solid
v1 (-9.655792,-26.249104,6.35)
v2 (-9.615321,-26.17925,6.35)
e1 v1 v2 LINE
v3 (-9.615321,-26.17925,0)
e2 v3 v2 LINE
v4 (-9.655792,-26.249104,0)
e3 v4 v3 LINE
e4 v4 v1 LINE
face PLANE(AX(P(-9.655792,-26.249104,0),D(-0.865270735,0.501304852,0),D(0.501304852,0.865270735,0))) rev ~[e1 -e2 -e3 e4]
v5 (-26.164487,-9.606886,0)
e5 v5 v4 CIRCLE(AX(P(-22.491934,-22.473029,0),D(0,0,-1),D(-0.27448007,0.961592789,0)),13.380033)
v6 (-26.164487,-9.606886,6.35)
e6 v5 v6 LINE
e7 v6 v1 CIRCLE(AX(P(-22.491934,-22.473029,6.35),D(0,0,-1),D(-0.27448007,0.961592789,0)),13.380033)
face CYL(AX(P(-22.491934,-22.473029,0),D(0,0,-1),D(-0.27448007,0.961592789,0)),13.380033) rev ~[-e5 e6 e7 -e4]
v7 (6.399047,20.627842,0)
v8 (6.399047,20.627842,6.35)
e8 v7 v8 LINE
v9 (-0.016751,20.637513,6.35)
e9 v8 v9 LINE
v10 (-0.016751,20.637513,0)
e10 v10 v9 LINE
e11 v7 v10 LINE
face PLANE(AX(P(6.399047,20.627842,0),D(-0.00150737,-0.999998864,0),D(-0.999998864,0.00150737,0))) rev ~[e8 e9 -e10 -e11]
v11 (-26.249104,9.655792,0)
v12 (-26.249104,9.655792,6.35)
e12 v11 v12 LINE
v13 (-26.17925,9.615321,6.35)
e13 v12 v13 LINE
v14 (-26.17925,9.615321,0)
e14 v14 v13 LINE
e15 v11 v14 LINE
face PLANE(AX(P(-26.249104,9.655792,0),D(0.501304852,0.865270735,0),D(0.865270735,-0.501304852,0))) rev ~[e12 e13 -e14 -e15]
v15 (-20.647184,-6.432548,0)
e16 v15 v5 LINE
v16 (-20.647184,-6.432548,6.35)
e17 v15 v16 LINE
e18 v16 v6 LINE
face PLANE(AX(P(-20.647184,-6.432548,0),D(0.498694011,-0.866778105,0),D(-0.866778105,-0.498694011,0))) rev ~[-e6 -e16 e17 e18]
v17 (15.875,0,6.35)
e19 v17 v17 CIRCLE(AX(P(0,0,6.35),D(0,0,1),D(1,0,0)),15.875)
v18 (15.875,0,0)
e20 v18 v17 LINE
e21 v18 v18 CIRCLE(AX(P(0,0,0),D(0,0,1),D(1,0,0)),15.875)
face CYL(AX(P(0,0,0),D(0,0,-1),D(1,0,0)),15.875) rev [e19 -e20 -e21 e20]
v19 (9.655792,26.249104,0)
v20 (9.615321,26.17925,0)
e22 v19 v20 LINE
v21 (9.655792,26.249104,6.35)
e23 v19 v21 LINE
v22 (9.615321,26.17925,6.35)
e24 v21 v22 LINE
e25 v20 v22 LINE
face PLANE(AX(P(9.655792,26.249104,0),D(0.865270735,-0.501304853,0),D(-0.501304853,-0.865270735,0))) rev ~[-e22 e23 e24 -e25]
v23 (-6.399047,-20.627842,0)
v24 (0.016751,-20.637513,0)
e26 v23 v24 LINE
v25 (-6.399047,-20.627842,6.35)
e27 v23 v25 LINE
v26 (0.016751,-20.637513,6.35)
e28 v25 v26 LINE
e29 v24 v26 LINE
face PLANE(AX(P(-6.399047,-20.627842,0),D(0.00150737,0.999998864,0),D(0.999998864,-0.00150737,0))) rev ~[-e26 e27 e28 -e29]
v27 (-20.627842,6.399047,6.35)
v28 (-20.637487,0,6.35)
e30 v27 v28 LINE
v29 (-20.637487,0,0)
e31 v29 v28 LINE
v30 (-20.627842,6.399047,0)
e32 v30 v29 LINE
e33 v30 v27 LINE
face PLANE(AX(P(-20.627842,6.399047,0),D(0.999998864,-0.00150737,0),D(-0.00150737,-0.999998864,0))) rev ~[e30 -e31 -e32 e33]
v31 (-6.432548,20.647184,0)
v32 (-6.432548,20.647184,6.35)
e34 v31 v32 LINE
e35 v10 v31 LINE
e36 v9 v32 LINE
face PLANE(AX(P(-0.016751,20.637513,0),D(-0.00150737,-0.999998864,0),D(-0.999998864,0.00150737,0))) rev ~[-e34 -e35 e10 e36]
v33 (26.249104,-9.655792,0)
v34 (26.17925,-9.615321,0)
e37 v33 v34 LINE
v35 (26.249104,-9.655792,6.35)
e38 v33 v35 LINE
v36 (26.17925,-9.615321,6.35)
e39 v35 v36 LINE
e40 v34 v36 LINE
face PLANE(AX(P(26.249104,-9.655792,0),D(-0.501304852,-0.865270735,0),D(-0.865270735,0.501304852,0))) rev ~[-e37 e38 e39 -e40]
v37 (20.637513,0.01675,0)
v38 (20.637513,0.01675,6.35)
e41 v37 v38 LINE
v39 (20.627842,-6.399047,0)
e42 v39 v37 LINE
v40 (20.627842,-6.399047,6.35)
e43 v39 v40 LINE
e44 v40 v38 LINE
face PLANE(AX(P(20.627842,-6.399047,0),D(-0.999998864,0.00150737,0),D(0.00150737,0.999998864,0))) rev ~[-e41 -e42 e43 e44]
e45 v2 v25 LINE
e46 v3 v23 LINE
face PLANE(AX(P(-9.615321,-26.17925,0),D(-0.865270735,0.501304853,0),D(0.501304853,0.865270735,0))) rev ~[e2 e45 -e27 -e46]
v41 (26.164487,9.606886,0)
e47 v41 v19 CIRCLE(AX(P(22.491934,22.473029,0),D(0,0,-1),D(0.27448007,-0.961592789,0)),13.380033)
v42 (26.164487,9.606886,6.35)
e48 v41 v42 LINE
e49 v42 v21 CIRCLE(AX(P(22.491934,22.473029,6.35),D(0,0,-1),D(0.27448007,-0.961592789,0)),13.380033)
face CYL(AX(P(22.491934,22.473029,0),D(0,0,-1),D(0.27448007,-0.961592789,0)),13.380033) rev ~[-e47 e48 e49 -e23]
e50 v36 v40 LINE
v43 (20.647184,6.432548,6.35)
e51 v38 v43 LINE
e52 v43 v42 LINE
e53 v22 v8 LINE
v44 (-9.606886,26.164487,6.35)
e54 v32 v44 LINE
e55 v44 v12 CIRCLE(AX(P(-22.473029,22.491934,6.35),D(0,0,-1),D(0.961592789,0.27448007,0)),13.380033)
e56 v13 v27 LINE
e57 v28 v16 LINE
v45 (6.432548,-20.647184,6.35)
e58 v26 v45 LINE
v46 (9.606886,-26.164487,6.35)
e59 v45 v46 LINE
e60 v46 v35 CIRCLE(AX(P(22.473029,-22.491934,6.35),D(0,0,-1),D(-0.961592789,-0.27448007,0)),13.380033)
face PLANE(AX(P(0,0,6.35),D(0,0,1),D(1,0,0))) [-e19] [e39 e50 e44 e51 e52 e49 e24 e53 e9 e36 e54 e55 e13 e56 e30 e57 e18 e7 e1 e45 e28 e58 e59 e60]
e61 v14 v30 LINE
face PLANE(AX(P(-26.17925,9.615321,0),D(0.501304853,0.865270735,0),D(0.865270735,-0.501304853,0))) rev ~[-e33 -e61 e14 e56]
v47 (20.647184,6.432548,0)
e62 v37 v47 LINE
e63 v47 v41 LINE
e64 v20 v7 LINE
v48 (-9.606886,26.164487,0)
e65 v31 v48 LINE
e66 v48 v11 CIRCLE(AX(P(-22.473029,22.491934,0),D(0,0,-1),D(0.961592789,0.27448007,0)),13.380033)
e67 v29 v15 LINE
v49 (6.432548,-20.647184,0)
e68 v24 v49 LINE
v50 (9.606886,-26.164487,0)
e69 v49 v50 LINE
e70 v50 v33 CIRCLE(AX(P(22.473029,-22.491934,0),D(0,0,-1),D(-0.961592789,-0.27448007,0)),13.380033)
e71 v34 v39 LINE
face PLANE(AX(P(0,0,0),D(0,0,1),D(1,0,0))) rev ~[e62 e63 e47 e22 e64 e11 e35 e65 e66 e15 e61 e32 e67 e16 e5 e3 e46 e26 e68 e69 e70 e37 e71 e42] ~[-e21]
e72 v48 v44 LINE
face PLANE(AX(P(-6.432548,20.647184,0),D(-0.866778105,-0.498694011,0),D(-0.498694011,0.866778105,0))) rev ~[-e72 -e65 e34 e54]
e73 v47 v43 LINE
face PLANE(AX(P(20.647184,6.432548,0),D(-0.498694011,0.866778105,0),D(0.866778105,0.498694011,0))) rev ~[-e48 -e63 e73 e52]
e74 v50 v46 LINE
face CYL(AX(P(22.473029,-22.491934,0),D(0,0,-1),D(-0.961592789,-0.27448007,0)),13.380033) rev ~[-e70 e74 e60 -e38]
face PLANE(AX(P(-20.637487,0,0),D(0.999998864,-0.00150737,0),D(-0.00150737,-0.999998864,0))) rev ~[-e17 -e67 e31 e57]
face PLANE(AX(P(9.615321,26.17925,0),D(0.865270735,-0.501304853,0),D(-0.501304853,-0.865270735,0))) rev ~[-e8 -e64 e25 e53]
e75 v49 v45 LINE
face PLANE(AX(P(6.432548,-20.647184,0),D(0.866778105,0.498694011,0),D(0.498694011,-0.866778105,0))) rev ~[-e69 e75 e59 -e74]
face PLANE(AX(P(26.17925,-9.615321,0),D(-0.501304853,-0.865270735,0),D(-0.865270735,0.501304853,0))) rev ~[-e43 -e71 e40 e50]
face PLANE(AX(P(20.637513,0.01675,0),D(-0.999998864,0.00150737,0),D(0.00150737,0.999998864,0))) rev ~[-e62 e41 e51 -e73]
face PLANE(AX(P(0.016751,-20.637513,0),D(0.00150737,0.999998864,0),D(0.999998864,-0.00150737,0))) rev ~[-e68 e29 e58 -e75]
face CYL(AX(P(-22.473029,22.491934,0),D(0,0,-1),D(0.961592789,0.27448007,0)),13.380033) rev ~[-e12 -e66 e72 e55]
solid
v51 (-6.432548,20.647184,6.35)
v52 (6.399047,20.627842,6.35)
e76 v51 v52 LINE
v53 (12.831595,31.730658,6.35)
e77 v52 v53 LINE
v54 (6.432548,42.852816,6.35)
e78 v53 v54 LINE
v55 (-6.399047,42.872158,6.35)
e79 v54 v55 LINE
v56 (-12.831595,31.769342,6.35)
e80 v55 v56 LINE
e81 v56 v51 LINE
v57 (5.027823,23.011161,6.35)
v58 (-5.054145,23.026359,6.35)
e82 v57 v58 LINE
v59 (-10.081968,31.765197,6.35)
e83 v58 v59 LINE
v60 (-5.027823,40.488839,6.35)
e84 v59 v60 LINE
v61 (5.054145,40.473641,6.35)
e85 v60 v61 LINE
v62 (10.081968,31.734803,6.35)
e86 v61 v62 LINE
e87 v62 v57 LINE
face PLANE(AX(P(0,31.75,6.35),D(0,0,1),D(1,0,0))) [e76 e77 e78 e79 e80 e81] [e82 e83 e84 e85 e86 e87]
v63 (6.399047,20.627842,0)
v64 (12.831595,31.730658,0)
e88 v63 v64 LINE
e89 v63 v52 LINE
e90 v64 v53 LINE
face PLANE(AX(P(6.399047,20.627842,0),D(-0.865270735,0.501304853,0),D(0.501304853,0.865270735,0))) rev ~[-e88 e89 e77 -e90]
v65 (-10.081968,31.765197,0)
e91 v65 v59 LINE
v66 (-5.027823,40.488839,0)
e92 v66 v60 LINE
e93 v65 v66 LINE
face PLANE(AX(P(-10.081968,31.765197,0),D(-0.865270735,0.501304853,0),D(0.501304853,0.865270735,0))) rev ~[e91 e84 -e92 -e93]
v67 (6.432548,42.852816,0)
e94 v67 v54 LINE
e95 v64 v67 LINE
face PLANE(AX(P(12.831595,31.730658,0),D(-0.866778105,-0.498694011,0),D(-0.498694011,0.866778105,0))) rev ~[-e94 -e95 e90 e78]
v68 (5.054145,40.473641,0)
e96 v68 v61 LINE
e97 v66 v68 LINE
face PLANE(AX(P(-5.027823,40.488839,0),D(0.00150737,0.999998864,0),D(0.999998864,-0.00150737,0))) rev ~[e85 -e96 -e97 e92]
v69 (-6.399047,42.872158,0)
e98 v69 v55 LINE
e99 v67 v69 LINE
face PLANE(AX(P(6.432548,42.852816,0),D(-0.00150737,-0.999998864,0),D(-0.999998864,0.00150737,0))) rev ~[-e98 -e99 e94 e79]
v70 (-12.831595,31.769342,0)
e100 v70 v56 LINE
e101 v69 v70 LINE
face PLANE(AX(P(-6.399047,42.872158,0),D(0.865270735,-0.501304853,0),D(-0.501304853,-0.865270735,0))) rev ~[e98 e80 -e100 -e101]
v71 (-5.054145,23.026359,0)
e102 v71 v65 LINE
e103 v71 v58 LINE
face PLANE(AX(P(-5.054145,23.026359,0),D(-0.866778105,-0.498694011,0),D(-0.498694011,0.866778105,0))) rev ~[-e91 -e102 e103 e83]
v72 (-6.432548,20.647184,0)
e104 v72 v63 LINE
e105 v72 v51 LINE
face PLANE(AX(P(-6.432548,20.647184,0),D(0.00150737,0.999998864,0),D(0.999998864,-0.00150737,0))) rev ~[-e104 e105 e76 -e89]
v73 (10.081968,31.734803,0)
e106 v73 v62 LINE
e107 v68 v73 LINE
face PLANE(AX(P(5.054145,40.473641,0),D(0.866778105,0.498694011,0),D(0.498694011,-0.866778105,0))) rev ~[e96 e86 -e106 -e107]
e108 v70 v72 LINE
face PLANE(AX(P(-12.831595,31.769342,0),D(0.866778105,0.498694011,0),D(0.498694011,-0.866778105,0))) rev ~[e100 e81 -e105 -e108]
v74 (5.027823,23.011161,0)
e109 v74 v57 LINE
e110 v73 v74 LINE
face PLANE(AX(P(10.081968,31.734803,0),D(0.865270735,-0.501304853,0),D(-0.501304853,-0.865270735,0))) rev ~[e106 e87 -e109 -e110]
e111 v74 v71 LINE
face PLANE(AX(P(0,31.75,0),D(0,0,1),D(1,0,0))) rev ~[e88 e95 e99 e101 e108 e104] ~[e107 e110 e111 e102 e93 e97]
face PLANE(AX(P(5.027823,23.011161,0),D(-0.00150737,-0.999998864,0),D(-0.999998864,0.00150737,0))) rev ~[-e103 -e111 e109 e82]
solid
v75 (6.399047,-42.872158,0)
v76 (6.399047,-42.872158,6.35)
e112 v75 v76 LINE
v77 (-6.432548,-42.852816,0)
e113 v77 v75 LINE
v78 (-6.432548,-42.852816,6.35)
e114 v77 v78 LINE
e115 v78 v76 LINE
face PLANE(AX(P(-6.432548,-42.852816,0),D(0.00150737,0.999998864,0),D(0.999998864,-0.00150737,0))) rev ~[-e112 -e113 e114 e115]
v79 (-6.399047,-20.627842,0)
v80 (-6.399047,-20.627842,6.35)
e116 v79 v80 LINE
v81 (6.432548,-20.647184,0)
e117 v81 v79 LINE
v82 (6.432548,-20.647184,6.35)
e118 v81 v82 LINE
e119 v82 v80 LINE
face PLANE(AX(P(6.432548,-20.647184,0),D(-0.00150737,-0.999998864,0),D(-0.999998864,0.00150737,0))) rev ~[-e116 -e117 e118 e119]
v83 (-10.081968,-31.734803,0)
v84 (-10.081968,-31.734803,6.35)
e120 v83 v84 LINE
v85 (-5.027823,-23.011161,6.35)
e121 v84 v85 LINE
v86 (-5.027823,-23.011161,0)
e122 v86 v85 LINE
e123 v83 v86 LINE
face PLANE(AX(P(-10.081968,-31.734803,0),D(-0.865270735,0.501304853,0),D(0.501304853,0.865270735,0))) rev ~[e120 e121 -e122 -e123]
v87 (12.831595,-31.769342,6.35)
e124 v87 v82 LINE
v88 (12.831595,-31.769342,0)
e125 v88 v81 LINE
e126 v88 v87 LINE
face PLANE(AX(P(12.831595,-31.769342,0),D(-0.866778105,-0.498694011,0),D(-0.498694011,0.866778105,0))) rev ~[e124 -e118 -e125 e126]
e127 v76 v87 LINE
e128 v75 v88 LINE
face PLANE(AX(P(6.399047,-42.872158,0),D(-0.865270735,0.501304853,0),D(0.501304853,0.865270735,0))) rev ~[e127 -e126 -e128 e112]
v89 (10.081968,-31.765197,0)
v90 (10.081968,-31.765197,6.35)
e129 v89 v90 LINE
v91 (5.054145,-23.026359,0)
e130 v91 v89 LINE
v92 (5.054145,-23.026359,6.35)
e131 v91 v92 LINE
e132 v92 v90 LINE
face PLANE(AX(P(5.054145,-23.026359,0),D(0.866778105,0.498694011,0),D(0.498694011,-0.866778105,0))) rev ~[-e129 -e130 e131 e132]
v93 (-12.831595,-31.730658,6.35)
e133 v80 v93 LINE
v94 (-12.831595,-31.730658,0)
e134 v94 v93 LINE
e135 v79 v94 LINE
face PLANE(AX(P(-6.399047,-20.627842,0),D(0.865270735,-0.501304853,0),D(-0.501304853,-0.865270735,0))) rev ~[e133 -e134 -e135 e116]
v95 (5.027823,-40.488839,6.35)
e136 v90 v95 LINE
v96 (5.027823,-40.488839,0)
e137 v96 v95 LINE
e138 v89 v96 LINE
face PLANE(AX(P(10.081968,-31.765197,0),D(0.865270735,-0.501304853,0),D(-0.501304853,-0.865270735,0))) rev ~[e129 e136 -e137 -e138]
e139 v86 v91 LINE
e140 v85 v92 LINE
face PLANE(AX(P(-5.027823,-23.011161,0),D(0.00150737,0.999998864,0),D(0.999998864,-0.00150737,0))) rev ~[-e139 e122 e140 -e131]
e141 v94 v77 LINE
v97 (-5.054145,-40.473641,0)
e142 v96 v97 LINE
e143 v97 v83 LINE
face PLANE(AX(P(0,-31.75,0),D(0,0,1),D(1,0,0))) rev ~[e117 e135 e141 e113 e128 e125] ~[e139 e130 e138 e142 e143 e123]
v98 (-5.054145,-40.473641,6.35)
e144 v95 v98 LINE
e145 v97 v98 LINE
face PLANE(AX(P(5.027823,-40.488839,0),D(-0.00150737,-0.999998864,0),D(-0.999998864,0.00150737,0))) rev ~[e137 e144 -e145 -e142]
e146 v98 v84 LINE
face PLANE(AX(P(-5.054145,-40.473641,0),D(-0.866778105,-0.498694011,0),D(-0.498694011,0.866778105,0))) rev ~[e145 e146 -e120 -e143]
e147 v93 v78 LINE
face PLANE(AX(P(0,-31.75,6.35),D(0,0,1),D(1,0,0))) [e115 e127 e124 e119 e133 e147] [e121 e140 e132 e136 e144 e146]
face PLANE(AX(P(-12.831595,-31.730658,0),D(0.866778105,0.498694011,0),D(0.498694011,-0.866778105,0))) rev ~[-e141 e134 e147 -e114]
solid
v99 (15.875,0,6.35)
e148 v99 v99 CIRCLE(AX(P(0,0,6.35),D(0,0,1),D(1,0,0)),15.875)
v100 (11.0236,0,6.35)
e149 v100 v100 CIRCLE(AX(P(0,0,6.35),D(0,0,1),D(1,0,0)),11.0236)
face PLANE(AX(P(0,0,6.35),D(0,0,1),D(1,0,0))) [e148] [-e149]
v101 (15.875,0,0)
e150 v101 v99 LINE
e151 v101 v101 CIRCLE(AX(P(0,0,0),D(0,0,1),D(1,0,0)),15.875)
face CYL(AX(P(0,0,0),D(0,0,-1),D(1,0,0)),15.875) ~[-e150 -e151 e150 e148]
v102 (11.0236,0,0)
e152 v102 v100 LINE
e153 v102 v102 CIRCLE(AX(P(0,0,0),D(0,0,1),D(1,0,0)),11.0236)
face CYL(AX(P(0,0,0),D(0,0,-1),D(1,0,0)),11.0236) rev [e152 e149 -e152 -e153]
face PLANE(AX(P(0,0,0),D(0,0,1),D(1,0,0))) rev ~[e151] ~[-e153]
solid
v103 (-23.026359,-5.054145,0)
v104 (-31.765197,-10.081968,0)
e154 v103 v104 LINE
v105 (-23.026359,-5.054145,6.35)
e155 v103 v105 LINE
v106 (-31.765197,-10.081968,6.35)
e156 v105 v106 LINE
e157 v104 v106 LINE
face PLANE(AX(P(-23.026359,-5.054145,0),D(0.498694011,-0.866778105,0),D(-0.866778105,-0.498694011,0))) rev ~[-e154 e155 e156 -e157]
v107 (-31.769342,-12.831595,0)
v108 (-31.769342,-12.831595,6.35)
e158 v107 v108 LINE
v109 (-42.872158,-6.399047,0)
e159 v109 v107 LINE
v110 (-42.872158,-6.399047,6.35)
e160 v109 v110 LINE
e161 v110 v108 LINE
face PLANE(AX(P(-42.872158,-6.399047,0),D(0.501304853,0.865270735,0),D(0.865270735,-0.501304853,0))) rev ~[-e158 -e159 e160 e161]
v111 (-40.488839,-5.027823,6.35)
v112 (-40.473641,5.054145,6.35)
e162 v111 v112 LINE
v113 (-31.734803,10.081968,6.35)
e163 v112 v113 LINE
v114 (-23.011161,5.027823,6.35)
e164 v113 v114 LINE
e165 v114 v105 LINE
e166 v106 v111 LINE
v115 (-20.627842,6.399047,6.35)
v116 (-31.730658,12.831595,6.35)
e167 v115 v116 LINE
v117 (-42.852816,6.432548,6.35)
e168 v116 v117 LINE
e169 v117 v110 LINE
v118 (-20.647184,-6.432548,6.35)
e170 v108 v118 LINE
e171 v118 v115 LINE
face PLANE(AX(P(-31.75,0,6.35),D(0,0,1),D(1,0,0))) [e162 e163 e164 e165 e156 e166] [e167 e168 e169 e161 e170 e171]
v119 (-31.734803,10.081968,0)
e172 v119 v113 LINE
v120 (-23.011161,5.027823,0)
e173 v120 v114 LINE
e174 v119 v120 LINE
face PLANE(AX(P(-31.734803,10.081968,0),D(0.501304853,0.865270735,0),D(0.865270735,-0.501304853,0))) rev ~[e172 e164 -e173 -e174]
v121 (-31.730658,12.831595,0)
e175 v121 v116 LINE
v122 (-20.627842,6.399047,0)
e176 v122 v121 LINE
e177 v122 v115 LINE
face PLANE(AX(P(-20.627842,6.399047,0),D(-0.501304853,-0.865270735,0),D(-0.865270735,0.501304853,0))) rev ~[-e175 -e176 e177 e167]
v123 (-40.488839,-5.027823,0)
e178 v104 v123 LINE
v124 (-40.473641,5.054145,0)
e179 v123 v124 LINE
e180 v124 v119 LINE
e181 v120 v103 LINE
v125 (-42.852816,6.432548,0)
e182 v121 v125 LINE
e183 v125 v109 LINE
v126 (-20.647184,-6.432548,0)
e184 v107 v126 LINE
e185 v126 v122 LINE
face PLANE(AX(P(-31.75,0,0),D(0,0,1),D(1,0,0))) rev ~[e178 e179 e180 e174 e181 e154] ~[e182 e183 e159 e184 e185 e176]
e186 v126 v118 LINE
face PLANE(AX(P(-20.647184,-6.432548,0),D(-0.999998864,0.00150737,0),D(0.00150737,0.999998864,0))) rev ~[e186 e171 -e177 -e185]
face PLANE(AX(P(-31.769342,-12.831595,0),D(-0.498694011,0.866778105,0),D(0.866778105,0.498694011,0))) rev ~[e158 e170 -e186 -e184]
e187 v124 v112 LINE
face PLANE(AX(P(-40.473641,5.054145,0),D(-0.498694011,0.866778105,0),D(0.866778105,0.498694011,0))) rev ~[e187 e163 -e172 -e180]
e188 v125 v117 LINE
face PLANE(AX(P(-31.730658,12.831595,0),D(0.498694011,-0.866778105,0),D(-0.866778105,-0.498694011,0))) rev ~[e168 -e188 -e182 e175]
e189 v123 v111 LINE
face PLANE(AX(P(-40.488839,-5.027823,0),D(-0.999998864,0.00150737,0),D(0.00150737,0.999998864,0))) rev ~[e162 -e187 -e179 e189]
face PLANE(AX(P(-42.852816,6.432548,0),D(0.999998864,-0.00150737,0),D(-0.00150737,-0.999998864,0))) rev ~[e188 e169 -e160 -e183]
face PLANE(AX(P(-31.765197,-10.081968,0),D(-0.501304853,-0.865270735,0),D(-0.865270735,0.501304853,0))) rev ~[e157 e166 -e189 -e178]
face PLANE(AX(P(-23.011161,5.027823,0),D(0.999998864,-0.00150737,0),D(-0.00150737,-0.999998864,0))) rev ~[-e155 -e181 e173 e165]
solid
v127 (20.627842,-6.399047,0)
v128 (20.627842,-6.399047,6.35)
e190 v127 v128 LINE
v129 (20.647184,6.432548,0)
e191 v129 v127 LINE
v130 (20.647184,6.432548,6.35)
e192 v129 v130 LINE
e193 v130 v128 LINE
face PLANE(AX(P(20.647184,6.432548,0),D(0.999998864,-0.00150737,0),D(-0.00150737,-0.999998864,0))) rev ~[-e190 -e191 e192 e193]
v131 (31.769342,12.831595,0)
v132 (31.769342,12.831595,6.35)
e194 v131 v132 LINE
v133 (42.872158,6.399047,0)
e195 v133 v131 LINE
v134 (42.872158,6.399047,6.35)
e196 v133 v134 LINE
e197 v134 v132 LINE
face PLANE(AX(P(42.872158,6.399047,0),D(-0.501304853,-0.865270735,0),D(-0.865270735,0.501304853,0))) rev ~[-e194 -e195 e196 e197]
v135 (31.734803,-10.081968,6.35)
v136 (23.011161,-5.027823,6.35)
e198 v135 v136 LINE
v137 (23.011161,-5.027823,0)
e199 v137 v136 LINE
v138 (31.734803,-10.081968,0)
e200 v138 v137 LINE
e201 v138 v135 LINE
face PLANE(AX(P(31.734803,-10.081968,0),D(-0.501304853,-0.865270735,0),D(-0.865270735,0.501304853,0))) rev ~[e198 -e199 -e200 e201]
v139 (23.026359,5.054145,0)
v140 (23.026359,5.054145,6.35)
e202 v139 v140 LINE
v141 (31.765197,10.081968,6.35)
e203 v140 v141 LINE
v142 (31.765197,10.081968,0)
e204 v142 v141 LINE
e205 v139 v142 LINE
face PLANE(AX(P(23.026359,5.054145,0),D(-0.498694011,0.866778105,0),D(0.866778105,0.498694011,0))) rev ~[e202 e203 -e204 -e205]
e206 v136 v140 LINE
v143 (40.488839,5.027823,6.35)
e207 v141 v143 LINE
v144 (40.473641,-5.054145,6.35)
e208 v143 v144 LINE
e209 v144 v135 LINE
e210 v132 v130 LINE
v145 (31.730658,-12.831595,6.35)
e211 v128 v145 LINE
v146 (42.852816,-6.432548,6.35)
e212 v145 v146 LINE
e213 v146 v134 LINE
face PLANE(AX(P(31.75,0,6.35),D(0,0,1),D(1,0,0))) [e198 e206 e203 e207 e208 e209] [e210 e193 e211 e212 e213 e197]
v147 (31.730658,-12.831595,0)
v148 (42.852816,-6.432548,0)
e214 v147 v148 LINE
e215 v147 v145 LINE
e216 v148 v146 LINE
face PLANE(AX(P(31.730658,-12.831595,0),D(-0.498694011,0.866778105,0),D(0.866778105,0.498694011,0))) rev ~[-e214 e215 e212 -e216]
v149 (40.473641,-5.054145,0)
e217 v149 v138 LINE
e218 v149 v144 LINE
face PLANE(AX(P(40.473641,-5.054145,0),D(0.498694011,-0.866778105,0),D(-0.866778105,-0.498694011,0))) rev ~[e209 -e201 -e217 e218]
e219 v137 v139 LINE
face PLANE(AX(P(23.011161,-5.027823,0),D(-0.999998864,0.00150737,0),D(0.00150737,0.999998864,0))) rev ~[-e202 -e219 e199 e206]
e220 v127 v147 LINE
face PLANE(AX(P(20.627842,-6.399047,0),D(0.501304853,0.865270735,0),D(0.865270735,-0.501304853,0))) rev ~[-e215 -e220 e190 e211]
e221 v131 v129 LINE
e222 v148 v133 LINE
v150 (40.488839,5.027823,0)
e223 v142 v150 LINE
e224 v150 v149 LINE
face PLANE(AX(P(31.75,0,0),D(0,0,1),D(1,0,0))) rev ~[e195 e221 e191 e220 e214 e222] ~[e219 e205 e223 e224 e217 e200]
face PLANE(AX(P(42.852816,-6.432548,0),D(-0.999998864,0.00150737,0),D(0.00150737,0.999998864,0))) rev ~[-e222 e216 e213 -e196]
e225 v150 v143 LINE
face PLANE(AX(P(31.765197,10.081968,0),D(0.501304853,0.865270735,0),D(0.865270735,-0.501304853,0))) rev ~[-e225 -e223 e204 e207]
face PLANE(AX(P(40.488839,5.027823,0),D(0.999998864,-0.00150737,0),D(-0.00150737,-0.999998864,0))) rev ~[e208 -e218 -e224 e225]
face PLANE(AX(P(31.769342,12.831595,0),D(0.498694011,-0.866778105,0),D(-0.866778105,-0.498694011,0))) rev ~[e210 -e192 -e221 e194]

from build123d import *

# Parameters (mm, degrees)
F1_R     = 15.875
F2_DEPTH = 6.35
F0_R     = 15.875
F0_R_2   = 11.0236


# Not quite as in the source:
# - ends of sketch curves that miss each other by under 0.0002 mm in the source are joined


with BuildPart() as f2:
    # F1 (on Top) → F2 (new body)
    with BuildSketch(Plane.XY):
        with BuildLine():
            Line((6.4325482308, -20.6471836189), (9.6068856074, -26.1644869672))
            ThreePointArc((9.6068856074, -26.1644869672), (13.0500837642, -12.9928085244), (26.2491039038, -9.6557918301))
            Line((26.2491039038, -9.6557918301), (26.1792498222, -9.6153210403))
            Line((26.1792498222, -9.6153210403), (20.6278416305, -6.3990469242))
            Line((20.6278416305, -6.3990469242), (20.6375126245, 0.0167504832))
            Line((20.6375126245, 0.0167504832), (20.6471836189, 6.4325482308))
            Line((20.6471836189, 6.4325482308), (26.1644869672, 9.6068856074))
            ThreePointArc((26.1644869672, 9.6068856074), (12.9928085244, 13.0500837642), (9.6557918301, 26.2491039038))
            Line((9.6557918301, 26.2491039038), (9.6153209659, 26.179249694))
            Line((9.6153209659, 26.179249694), (6.3990469242, 20.6278416305))
            Line((6.3990469242, 20.6278416305), (-0.0167505253, 20.6375126245))
            Line((-0.0167505253, 20.6375126245), (-6.4325482308, 20.6471836189))
            Line((-6.4325482308, 20.6471836189), (-9.6068856074, 26.1644869672))
            ThreePointArc((-9.6068856074, 26.1644869672), (-13.0500837642, 12.9928085244), (-26.2491039038, 9.6557918301))
            Line((-26.2491039038, 9.6557918301), (-26.1792498222, 9.6153210403))
            Line((-26.1792498222, 9.6153210403), (-20.6278416305, 6.3990469242))
            Line((-20.6278416305, 6.3990469242), (-20.6374873753, -1.9e-08))
            Line((-20.6374873753, -1.9e-08), (-20.6471836189, -6.4325482308))
            Line((-20.6471836189, -6.4325482308), (-26.1644869672, -9.6068856074))
            ThreePointArc((-26.1644869672, -9.6068856074), (-12.9928085244, -13.0500837642), (-9.6557918301, -26.2491039038))
            Line((-9.6557918301, -26.2491039038), (-9.6153210403, -26.1792498222))
            Line((-9.6153210403, -26.1792498222), (-6.3990469242, -20.6278416305))
            Line((-6.3990469242, -20.6278416305), (0.0167507419, -20.6375126249))
            Line((0.0167507419, -20.6375126249), (6.4325482308, -20.6471836189))
        make_face()
        Circle(F1_R, mode=Mode.SUBTRACT)
    extrude(amount=F2_DEPTH)


with BuildPart() as f2b:
    # F0 (on Top) → F2, piece 2 (new body)
    with BuildSketch(Plane.XY):
        Circle(F0_R)
        Circle(F0_R_2, mode=Mode.SUBTRACT)
    extrude(amount=F2_DEPTH)


with BuildPart() as f2c:
    # F0 (on Top) → F2, piece 3 (new body)
    with BuildSketch(Plane.XY):
        Polygon((6.3990469242, 20.6278416305), (12.831595155, 31.7306580116), (6.4325482308, 42.8528163811), (-6.3990469242, 42.8721583695), (-12.831595155, 31.7693419884), (-6.4325482308, 20.6471836189), align=None)
        Polygon((-5.0278225833, 40.4888387189), (5.0541450385, 40.4736414423), (10.0819676218, 31.7348027234), (5.0278225833, 23.0111612811), (-5.0541450385, 23.0263585577), (-10.0819676218, 31.7651972766), align=None, mode=Mode.SUBTRACT)
    extrude(amount=F2_DEPTH)


with BuildPart() as f2d:
    # F0 (on Top) → F2, piece 4 (new body)
    with BuildSketch(Plane.XY):
        Polygon((31.7693419884, 12.831595155), (20.6471836189, 6.4325482308), (20.6278416305, -6.3990469242), (31.7306580116, -12.831595155), (42.8528163811, -6.4325482308), (42.8721583695, 6.3990469242), align=None)
        Polygon((31.7348027234, -10.0819676218), (23.0111612811, -5.0278225833), (23.0263585577, 5.0541450385), (31.7651972766, 10.0819676218), (40.4888387189, 5.0278225833), (40.4736414423, -5.0541450385), align=None, mode=Mode.SUBTRACT)
    extrude(amount=F2_DEPTH)


with BuildPart() as f2e:
    # F0 (on Top) → F2, piece 5 (new body)
    with BuildSketch(Plane.XY):
        Polygon((12.831595155, -31.7693419884), (6.4325482308, -20.6471836189), (-6.3990469242, -20.6278416305), (-12.831595155, -31.7306580116), (-6.4325482308, -42.8528163811), (6.3990469242, -42.8721583695), align=None)
        Polygon((-10.0819676218, -31.7348027234), (-5.0278225833, -23.0111612811), (5.0541450385, -23.0263585577), (10.0819676218, -31.7651972766), (5.0278225833, -40.4888387189), (-5.0541450385, -40.4736414423), align=None, mode=Mode.SUBTRACT)
    extrude(amount=F2_DEPTH)


with BuildPart() as f2f:
    # F0 (on Top) → F2, piece 6 (new body)
    with BuildSketch(Plane.XY):
        Polygon((-31.7693419884, -12.831595155), (-20.6471836189, -6.4325482308), (-20.6278416305, 6.3990469242), (-31.7306580116, 12.831595155), (-42.8528163811, 6.4325482308), (-42.8721583695, -6.3990469242), align=None)
        Polygon((-31.7348027234, 10.0819676218), (-23.0111612811, 5.0278225833), (-23.0263585577, -5.0541450385), (-31.7651972766, -10.0819676218), (-40.4888387189, -5.0278225833), (-40.4736414423, 5.0541450385), align=None, mode=Mode.SUBTRACT)
    extrude(amount=F2_DEPTH)


solid = Compound([f2.part, f2b.part, f2c.part, f2d.part, f2e.part, f2f.part])
